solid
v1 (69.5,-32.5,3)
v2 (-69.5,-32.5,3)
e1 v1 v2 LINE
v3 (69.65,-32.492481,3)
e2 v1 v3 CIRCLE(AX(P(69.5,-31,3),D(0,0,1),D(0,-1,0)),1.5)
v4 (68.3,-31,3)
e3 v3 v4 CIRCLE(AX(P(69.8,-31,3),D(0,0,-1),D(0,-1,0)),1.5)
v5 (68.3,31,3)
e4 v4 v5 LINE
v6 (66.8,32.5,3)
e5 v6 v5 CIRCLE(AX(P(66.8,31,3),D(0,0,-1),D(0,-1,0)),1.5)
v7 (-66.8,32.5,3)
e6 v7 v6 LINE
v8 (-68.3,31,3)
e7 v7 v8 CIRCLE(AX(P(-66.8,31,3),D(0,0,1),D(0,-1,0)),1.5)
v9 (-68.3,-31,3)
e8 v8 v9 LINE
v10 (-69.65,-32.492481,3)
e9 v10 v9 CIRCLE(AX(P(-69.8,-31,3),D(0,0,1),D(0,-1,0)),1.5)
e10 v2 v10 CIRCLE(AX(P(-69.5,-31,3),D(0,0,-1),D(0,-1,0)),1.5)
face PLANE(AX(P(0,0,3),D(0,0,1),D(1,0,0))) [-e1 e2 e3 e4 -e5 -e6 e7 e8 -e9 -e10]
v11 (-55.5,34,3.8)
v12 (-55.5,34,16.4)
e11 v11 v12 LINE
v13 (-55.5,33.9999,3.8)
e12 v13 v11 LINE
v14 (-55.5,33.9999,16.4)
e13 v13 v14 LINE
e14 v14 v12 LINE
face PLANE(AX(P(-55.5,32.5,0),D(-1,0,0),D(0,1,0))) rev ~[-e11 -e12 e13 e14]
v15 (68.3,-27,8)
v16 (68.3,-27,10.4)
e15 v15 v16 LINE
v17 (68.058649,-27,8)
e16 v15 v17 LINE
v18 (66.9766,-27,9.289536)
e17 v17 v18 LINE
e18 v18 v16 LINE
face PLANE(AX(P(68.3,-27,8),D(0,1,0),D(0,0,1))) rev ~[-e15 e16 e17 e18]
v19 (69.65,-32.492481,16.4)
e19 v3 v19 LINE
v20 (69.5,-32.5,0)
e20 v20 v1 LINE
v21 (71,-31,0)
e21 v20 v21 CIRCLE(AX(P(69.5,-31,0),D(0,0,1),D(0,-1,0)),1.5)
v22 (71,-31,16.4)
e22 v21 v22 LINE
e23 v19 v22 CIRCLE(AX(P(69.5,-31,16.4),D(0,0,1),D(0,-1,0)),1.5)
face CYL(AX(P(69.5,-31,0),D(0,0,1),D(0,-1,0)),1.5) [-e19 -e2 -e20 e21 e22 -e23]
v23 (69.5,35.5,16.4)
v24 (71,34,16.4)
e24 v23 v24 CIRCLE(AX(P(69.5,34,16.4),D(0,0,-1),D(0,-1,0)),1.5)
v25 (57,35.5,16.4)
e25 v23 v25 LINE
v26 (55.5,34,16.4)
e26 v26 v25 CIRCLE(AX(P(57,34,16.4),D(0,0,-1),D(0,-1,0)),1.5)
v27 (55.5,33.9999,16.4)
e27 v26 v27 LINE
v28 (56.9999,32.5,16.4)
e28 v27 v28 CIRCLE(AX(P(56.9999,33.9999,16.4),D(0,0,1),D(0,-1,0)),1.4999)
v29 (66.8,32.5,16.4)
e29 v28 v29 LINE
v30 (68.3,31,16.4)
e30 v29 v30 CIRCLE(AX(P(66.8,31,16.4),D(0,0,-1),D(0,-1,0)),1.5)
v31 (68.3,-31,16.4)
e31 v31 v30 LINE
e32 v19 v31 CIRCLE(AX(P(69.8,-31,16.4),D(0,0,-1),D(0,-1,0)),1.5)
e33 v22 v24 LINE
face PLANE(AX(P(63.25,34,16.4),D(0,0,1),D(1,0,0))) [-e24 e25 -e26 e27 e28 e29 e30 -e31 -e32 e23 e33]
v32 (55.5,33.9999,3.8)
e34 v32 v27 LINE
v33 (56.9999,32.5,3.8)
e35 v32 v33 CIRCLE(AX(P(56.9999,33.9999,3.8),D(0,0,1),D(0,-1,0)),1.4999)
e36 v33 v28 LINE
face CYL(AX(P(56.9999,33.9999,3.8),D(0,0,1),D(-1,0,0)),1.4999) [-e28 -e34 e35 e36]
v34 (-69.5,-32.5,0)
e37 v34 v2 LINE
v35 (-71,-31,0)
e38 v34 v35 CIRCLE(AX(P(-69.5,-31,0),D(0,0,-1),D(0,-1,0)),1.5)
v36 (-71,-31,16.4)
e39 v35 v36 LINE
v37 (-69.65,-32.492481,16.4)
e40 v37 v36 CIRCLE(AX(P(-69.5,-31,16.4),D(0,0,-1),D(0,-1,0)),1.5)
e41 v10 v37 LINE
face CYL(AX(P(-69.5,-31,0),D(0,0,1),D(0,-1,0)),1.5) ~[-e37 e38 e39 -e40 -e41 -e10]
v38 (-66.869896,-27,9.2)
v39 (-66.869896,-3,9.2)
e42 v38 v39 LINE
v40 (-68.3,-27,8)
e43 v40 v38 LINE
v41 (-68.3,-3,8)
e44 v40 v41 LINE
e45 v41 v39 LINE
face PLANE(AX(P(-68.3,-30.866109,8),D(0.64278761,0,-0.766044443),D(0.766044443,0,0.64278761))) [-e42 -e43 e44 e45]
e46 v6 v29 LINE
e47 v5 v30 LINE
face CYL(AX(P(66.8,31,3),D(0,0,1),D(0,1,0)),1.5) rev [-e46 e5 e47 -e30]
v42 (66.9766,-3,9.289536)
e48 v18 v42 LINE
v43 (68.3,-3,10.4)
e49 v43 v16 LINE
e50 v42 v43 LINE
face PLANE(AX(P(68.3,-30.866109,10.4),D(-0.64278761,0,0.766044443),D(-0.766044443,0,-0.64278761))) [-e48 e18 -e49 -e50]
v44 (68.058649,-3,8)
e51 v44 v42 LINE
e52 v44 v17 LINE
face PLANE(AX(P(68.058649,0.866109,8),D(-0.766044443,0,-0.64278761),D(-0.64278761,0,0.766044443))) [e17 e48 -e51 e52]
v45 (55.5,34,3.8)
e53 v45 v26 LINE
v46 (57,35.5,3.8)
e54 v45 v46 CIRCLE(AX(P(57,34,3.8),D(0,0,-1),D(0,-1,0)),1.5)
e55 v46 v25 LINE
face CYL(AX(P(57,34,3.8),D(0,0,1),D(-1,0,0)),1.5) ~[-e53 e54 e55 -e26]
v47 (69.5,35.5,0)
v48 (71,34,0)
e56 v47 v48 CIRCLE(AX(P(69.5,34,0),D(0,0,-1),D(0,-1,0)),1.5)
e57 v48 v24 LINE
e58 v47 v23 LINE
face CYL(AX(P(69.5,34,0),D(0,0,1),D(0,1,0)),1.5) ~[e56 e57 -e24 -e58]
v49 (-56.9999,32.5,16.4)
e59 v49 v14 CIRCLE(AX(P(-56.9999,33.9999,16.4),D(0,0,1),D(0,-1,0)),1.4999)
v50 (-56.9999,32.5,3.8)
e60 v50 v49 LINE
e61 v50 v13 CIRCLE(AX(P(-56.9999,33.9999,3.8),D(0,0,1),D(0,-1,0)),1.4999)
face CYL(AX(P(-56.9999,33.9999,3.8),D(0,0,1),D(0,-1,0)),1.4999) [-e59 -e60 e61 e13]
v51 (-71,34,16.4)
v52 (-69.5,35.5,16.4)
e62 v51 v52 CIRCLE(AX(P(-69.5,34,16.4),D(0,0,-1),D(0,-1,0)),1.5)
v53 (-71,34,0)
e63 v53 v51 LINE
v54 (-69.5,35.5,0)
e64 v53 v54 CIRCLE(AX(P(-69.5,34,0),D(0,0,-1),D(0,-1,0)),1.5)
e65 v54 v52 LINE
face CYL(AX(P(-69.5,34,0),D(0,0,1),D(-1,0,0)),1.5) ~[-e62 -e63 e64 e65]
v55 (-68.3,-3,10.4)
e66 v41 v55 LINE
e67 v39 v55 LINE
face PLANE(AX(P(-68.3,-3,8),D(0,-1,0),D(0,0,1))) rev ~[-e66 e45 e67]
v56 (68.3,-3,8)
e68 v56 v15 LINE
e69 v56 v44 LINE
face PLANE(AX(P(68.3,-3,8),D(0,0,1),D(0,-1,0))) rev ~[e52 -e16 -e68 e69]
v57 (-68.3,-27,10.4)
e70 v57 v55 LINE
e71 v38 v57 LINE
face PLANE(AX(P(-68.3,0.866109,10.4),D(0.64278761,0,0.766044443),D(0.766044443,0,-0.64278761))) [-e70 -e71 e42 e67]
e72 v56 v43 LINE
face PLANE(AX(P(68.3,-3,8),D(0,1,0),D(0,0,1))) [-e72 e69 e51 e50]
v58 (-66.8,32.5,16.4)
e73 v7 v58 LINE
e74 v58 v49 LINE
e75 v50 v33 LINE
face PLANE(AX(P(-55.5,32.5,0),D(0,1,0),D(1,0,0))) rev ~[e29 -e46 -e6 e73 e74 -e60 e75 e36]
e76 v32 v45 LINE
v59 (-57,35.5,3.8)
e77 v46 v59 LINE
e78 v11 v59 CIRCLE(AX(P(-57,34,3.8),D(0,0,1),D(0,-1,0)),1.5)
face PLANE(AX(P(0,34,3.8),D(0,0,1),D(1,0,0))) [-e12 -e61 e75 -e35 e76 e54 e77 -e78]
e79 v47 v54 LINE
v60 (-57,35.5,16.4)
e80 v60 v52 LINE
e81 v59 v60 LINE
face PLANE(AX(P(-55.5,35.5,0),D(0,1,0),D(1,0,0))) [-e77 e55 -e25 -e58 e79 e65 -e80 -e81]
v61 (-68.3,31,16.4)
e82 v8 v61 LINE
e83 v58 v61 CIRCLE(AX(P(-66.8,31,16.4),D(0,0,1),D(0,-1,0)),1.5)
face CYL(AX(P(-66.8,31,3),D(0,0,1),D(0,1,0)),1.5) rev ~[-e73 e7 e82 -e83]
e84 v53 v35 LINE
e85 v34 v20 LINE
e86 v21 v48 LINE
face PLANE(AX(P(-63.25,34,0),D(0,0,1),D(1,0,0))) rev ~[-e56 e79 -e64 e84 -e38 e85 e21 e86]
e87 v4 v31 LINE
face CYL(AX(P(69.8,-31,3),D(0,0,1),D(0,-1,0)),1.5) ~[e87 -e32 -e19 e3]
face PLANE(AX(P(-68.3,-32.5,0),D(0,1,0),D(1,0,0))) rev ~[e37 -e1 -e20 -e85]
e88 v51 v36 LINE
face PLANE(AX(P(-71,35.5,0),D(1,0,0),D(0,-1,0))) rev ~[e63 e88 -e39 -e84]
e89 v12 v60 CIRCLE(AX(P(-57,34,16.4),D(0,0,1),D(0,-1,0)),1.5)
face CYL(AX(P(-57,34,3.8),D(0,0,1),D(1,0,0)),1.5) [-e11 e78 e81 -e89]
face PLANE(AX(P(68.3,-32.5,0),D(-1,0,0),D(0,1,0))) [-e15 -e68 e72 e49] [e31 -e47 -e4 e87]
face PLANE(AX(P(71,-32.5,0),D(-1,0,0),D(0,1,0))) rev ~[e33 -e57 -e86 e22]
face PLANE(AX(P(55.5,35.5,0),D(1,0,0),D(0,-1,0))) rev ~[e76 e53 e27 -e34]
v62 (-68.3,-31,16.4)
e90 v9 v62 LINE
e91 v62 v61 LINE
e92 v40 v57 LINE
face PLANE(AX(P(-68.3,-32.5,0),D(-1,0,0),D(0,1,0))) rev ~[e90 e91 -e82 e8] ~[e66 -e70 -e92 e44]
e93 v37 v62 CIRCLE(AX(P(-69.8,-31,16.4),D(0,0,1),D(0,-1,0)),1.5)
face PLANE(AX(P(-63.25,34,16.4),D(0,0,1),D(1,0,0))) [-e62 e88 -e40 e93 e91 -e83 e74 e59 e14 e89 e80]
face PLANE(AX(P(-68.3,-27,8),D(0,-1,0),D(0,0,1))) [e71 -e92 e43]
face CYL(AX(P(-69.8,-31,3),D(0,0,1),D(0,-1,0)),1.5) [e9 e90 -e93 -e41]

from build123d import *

# Parameters (mm, degrees)
F1_DEPTH     = 3
F0_W         = 2.7
F0_H         = 65
F2_DEPTH     = 16.4
F0_W_2       = 111
F0_H_2       = 3
F3_DEPTH     = 3.8
F4_W         = 24
F4_H         = 2.4
F5_DEPTH     = 1.5
F6_W         = 24
F6_H         = 2.4
F7_DEPTH     = 1.5
F8_T1_DEPTH  = 31.73221831
F8_T6_DEPTH  = 31.73221831
F8_T11_DEPTH = 31.73221831
F8_T16_DEPTH = 31.73221831
F9_F1_R      = 1.5
F9_F2_R      = 1.5
F9_F3_R      = 1.4999
F9_F4_R      = 1.4999
F9_F5_R      = 1.5
F9_F6_R      = 1.5
F9_F7_R      = 1.5
F9_F8_R      = 1.5
F9_F9_R      = 1.5
F9_F10_R     = 1.5
F9_F11_R     = 1.5
F9_F12_R     = 1.5


# Not quite as in the source:
# - a fillet or chamfer that OpenCascade refuses, or shapes differently, is made with other operations: its cross-section is extruded or revolved along the edge and cut away or added
# - a fillet or chamfer is up to 0.001 mm smaller than in the source, because OpenCascade refuses the exact size


with BuildPart() as f1:
    # F0 (on Top) → F1 (new body)
    with BuildSketch(Plane.XY):
        Polygon((-68.3, -32.5), (68.3, -32.5), (68.3, 32.5), (55.5, 32.5), (-55.5, 32.5), (-68.3, 32.5), align=None)
    extrude(amount=F1_DEPTH)

    # F0 (on Top) → F2 (join)
    with BuildSketch(Plane.XY):
        Polygon((-71, 32.5), (-68.3, 32.5), (-55.5, 32.5), (-55.5, 35.5), (-71, 35.5), align=None)
        with Locations((-69.65, 0)):
            Rectangle(F0_W, F0_H)
        Polygon((68.3, 32.5), (71, 32.5), (71, 35.5), (55.5, 35.5), (55.5, 32.5), align=None)
        with Locations((69.65, 0)):
            Rectangle(F0_W, F0_H)
    extrude(amount=F2_DEPTH)

    # F0 (on Top) → F3 (join)
    with BuildSketch(Plane.XY):
        with Locations((0, 34)):
            Rectangle(F0_W_2, F0_H_2)
    extrude(amount=F3_DEPTH)

    # F4 (on face) → F5 (join)
    with BuildSketch(Plane.YZ.offset(-68.3)):
        with Locations((-15, 9.2)):
            Rectangle(F4_W, F4_H)
    extrude(amount=F5_DEPTH)

    # F6 (on face) → F7 (join)
    with BuildSketch(Plane(origin=(68.3, 0, 0), x_dir=(0, -1, 0), z_dir=(-1, 0, 0))):
        with Locations((15, 9.2)):
            Rectangle(F6_W, F6_H)
    extrude(amount=F7_DEPTH)

    # F8: chamfer of 1.5 x 1.2586494468 on 4 edges, made by hand

    # F8_s2 → F8_t1 (cut)
    with BuildSketch(Plane.XZ.offset(-0.866109155)):
        Polygon((68.0586494468, 8), (66.8, 9.5), (66.8, 8), align=None)
    extrude(amount=F8_T1_DEPTH, mode=Mode.SUBTRACT)


with BuildPart() as f8_tool4:
    # F8_s5 → F8_t6 (new body)
    with BuildSketch(Plane.XZ.offset(-0.866109155)):
        Polygon((-68.3, 10.4), (-66.8, 9.1413505532), (-66.8, 10.4), align=None)
    extrude(amount=F8_T6_DEPTH)

    split(bisect_by=Plane.YZ.offset(-68.3), keep=Keep.TOP)


with BuildPart() as f1_1:
    add(f1.part)

    # F8_t3: cut F8_tool4
    add(f8_tool4.part, mode=Mode.SUBTRACT)


with BuildPart() as f8_tool9:
    # F8_s10 → F8_t11 (new body)
    with BuildSketch(Plane.XZ.offset(30.866109155)):
        Polygon((68.3, 10.4), (66.8, 9.1413505532), (66.8, 10.4), align=None)
    extrude(amount=-F8_T11_DEPTH)

    split(bisect_by=Plane.YZ.offset(68.3), keep=Keep.BOTTOM)


with BuildPart() as f1_2:
    add(f1_1.part)

    # F8_t8: cut F8_tool9
    add(f8_tool9.part, mode=Mode.SUBTRACT)


with BuildPart() as f8_tool14:
    # F8_s15 → F8_t16 (new body)
    with BuildSketch(Plane.XZ.offset(30.866109155)):
        Polygon((-68.3, 8), (-66.8, 9.2586494468), (-66.8, 8), align=None)
    extrude(amount=-F8_T16_DEPTH)

    split(bisect_by=Plane.YZ.offset(-68.3), keep=Keep.TOP)


with BuildPart() as f1_3:
    add(f1_2.part)

    # F8_t13: cut F8_tool14
    add(f8_tool14.part, mode=Mode.SUBTRACT)

    # F9: fillet of radius 1.5 on 12 edges, made by hand

    # F9_f1
    f9_f1_edges = [f1_3.edges().sort_by_distance(p)[0] for p in [
        (55.5, 35.5, 10.1),
    ]]
    fillet(f9_f1_edges, radius=F9_F1_R)

    # F9_f2
    f9_f2_edges = [f1_3.edges().sort_by_distance(p)[0] for p in [
        (-55.5, 35.5, 10.1),
    ]]
    fillet(f9_f2_edges, radius=F9_F2_R)

    # F9_f3 (radius 1.5 in the source; OpenCascade refuses exactly that, so slightly less here)
    f9_f3_edges = [f1_3.edges().sort_by_distance(p)[0] for p in [
        (-55.5, 32.5, 10.1),
    ]]
    fillet(f9_f3_edges, radius=F9_F3_R)

    # F9_f4 (radius 1.5 in the source; OpenCascade refuses exactly that, so slightly less here)
    f9_f4_edges = [f1_3.edges().sort_by_distance(p)[0] for p in [
        (55.5, 32.5, 10.1),
    ]]
    fillet(f9_f4_edges, radius=F9_F4_R)

    # F9_f5
    f9_f5_edges = [f1_3.edges().sort_by_distance(p)[0] for p in [
        (-68.3, -32.5, 9.7),
    ]]
    fillet(f9_f5_edges, radius=F9_F5_R)

    # F9_f6
    f9_f6_edges = [f1_3.edges().sort_by_distance(p)[0] for p in [
        (68.3, -32.5, 9.7),
    ]]
    fillet(f9_f6_edges, radius=F9_F6_R)

    # F9_f7
    f9_f7_edges = [f1_3.edges().sort_by_distance(p)[0] for p in [
        (-68.3, 32.5, 9.7),
    ]]
    fillet(f9_f7_edges, radius=F9_F7_R)

    # F9_f8
    f9_f8_edges = [f1_3.edges().sort_by_distance(p)[0] for p in [
        (68.3, 32.5, 9.7),
    ]]
    fillet(f9_f8_edges, radius=F9_F8_R)

    # F9_f9
    f9_f9_edges = [f1_3.edges().sort_by_distance(p)[0] for p in [
        (-71, -32.5, 8.2),
    ]]
    fillet(f9_f9_edges, radius=F9_F9_R)

    # F9_f10
    f9_f10_edges = [f1_3.edges().sort_by_distance(p)[0] for p in [
        (71, -32.5, 8.2),
    ]]
    fillet(f9_f10_edges, radius=F9_F10_R)

    # F9_f11
    f9_f11_edges = [f1_3.edges().sort_by_distance(p)[0] for p in [
        (-71, 35.5, 8.2),
    ]]
    fillet(f9_f11_edges, radius=F9_F11_R)

    # F9_f12
    f9_f12_edges = [f1_3.edges().sort_by_distance(p)[0] for p in [
        (71, 35.5, 8.2),
    ]]
    fillet(f9_f12_edges, radius=F9_F12_R)


solid = f1_3.part
